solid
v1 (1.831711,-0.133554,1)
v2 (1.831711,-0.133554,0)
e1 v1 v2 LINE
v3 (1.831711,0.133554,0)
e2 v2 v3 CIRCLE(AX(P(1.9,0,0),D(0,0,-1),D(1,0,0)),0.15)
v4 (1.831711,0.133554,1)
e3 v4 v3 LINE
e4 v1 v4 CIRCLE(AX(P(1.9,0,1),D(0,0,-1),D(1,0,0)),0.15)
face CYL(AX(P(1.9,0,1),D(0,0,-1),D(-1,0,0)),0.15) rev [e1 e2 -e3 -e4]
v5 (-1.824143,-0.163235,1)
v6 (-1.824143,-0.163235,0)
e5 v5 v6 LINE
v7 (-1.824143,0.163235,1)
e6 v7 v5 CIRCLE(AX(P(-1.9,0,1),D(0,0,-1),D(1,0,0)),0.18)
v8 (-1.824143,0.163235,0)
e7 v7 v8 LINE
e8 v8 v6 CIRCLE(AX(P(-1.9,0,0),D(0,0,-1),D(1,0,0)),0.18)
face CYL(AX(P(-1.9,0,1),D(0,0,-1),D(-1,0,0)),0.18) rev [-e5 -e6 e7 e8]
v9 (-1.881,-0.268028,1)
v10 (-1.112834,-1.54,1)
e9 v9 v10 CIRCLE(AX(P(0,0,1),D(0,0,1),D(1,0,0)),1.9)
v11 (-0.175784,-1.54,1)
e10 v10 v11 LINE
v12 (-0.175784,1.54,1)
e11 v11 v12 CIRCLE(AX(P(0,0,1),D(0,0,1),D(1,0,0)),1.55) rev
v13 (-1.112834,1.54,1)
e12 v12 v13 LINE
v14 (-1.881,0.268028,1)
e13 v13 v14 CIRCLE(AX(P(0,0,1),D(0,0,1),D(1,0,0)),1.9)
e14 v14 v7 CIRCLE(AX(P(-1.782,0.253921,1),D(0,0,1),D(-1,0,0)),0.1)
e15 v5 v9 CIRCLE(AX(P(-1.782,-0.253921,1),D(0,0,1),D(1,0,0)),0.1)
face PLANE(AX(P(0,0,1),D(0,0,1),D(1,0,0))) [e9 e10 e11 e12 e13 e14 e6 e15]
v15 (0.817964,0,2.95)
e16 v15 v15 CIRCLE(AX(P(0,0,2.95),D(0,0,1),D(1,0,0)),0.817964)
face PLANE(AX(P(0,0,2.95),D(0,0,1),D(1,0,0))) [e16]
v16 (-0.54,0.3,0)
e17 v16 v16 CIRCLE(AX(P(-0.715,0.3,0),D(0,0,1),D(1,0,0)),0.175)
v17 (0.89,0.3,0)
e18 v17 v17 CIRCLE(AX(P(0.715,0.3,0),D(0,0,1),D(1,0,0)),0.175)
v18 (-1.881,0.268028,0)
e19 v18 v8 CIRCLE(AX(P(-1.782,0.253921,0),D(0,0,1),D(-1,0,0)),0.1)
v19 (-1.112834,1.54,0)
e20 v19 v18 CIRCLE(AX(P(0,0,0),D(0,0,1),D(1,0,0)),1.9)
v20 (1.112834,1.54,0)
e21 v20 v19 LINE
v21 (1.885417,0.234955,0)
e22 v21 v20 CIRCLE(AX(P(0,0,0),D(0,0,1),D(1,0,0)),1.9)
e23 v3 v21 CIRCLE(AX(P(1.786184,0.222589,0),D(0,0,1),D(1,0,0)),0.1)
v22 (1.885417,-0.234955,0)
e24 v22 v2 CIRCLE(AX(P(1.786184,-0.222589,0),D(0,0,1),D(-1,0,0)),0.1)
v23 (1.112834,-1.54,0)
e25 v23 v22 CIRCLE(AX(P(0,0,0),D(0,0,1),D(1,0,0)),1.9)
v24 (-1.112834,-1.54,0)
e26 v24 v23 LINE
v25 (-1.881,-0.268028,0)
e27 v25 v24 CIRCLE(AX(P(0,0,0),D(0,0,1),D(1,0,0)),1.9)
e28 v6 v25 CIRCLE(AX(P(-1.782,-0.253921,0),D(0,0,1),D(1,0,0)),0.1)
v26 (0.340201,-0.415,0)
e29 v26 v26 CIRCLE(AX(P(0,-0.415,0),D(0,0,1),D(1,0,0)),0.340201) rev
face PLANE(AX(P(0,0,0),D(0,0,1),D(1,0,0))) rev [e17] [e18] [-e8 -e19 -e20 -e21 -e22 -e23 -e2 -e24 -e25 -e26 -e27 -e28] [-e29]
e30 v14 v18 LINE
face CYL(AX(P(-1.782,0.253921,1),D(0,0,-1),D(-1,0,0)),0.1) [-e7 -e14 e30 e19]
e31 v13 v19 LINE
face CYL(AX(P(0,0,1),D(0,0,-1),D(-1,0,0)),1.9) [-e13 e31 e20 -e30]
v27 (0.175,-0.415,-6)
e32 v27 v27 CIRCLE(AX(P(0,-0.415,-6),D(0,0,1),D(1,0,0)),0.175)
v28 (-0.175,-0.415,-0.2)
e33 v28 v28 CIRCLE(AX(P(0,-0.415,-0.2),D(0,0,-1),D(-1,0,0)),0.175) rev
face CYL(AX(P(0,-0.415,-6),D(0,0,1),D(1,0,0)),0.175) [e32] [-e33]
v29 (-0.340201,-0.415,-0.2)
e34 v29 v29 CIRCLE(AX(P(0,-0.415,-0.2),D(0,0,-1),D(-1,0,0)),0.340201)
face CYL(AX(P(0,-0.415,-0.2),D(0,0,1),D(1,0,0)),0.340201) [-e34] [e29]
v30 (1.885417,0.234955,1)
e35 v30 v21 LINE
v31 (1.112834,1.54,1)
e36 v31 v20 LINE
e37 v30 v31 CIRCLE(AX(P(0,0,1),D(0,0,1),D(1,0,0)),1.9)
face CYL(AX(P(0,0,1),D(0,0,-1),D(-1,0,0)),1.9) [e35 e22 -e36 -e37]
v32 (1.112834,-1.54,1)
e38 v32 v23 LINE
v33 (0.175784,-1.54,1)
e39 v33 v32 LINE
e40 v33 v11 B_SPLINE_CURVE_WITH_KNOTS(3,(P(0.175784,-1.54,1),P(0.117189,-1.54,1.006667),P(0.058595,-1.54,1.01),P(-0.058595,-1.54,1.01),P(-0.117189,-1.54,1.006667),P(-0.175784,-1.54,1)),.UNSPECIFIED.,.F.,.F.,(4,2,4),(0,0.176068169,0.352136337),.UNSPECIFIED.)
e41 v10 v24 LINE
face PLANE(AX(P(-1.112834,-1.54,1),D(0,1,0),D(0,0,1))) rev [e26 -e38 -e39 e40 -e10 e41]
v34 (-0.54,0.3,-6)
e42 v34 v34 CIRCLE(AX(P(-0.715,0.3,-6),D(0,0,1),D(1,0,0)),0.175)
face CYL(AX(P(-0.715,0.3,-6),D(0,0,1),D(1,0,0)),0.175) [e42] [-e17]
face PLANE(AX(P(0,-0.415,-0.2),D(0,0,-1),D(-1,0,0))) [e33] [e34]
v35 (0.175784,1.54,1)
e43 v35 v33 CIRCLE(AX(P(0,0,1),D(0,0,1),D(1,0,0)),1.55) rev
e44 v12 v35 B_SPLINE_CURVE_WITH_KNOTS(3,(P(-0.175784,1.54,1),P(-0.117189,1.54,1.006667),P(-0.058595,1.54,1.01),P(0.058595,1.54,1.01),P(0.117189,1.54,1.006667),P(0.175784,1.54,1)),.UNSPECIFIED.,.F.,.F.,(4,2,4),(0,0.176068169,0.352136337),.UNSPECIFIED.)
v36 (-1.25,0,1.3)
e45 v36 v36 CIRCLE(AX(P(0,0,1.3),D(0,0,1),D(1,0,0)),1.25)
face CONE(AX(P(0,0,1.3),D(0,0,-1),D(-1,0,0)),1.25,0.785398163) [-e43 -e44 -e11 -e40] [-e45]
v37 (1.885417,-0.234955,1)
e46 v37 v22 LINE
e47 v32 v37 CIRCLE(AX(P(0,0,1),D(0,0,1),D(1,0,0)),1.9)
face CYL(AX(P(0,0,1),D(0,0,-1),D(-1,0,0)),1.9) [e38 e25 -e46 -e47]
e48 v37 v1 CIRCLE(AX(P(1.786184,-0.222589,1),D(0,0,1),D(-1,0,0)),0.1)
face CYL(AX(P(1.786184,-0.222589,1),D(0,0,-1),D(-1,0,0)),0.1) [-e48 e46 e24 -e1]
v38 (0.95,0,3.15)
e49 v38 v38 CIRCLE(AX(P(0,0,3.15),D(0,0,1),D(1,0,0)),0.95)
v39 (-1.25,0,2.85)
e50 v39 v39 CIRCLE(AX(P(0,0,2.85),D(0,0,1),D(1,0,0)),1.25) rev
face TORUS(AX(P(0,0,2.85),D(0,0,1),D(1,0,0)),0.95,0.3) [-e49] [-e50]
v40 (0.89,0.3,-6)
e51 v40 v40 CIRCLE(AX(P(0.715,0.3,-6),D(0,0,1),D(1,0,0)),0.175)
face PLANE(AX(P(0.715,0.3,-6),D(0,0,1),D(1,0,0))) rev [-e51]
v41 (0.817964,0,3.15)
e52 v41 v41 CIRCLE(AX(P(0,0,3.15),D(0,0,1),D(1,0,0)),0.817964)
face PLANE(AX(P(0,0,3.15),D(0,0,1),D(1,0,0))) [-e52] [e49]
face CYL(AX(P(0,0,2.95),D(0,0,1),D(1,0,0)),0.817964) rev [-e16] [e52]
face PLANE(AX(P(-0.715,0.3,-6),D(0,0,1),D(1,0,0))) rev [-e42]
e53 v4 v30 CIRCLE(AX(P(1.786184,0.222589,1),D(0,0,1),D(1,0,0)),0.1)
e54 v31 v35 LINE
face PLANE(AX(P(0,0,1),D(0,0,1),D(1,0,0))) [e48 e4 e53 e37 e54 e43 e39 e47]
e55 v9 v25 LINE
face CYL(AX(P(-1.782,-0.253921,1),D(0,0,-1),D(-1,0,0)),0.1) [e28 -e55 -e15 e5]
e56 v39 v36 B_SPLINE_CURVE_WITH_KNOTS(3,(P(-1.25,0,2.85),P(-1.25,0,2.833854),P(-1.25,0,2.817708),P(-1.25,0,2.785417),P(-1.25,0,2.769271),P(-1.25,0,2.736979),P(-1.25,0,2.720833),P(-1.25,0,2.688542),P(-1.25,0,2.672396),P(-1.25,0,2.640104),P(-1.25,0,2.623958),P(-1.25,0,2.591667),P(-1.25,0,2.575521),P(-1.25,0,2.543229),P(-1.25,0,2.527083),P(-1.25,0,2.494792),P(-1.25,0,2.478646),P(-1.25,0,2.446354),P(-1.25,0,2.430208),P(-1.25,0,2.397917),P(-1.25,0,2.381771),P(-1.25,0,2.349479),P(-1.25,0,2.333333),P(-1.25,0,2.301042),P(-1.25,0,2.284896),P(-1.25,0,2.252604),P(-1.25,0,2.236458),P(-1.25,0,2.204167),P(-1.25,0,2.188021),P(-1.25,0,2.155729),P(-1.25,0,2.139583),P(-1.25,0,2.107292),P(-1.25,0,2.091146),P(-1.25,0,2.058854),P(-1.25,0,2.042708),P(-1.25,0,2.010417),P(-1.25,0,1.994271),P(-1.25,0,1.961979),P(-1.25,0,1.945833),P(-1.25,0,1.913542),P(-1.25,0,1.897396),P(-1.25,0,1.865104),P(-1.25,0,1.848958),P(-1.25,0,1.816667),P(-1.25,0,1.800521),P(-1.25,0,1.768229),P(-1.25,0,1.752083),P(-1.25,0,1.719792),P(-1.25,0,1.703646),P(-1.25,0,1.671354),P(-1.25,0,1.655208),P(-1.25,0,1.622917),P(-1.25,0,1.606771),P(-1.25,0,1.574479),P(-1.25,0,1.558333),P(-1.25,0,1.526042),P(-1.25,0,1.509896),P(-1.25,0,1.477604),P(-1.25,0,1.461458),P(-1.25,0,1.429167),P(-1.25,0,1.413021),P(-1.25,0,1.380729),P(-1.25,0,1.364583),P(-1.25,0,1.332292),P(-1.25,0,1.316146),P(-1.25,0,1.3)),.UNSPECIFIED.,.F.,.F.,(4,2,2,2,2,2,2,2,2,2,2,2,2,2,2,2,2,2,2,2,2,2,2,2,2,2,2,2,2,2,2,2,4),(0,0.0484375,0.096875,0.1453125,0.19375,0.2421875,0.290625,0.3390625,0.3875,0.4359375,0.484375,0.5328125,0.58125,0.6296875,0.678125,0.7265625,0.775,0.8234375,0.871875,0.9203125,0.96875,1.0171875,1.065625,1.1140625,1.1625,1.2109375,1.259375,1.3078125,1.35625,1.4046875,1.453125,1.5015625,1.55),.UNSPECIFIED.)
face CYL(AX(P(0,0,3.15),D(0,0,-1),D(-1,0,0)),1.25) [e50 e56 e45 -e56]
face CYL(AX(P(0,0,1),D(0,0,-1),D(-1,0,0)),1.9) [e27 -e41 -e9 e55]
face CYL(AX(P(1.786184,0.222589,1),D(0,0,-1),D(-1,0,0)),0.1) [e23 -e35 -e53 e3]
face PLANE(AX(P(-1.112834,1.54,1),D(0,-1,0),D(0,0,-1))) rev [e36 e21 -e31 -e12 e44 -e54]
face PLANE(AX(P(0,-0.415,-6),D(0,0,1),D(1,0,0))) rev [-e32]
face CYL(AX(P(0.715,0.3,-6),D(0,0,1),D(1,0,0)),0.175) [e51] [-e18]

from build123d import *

# Parameters (mm, degrees)
BOSS_EXTRUDE1_DEPTH = 1
SKETCH3_R           = 1.25
BOSS_EXTRUDE2_DEPTH = 2.15
CHAMFER1_SIZE       = 0.3
FILLET1_R           = 0.3
SKETCH4_R           = 0.817963918
CUT_EXTRUDE1_DEPTH  = 0.2
SKETCH5_R           = 0.175
BOSS_EXTRUDE3_DEPTH = 6
SKETCH6_R           = 0.340201154
BOSS_EXTRUDE4_DEPTH = 0.2


with BuildPart() as part:
    # Sketch1 → Boss-Extrude1 (new body)
    with BuildSketch(Plane.XY):
        with BuildLine():
            Line((-1.112834219, 1.54), (1.112834219, 1.54))
            ThreePointArc((1.112834219, 1.54), (1.63498089, 0.967903657), (1.885416667, 0.2349553))
            ThreePointArc((1.885416667, 0.2349553), (1.874554764, 0.175784903), (1.831710526, 0.133553539))
            ThreePointArc((1.831710526, 0.133553539), (1.75, 0), (1.831710526, -0.133553539))
            ThreePointArc((1.831710526, -0.133553539), (1.874554764, -0.175784903), (1.885416667, -0.2349553))
            ThreePointArc((1.885416667, -0.2349553), (1.63498089, -0.967903657), (1.112834219, -1.54))
            Line((1.112834219, -1.54), (-1.112834219, -1.54))
            ThreePointArc((-1.112834219, -1.54), (-1.626419084, -0.982222462), (-1.881, -0.268027984))
            ThreePointArc((-1.881, -0.268027984), (-1.869896042, -0.206231776), (-1.824142857, -0.163235088))
            ThreePointArc((-1.824142857, -0.163235088), (-1.72, 0), (-1.824142857, 0.163235088))
            ThreePointArc((-1.824142857, 0.163235088), (-1.869896042, 0.206231776), (-1.881, 0.268027984))
            ThreePointArc((-1.881, 0.268027984), (-1.626419084, 0.982222462), (-1.112834219, 1.54))
        make_face()
    extrude(amount=BOSS_EXTRUDE1_DEPTH)

    # Sketch3 → Boss-Extrude2 (add)
    with BuildSketch(Plane.XY.offset(1)):
        with Locations(Location((0, 0, 0), (0, 0, 180))):
            Circle(SKETCH3_R)
    extrude(amount=BOSS_EXTRUDE2_DEPTH)

    # Chamfer1
    # the kernel refuses this chamfer: 0.3 mm, written as the material it adds along each edge
    with BuildSketch(Plane(origin=(0, 0, 1), x_dir=(-1, 0, 0), z_dir=(0, 1, 0))) as chamfer1_piece_1_section:
        Polygon((1.25 + CHAMFER1_SIZE, 0), (1.25, CHAMFER1_SIZE), (1.25, 0), align=None)
    chamfer1_piece_1 = revolve(axis=Axis((0, 0, 1), (0, 0, 1)), mode=Mode.PRIVATE)
    chamfer1_piece_1 = split(chamfer1_piece_1, bisect_by=Plane(origin=(1.394706395, -1.54, 1.144706395), z_dir=(0, 1, 0)), keep=Keep.TOP, mode=Mode.PRIVATE)
    chamfer1_piece_1 = split(chamfer1_piece_1, bisect_by=Plane(origin=(1.394706395, 1.54, 1.144706395), z_dir=(0, -1, 0)), keep=Keep.TOP, mode=Mode.PRIVATE)
    add(chamfer1_piece_1)

    # Fillet1
    fillet1_edges = [part.edges().sort_by_distance(p)[0] for p in [
        (1.25, 0, 3.15),
    ]]
    fillet(fillet1_edges, radius=FILLET1_R)

    # Sketch4 → Cut-Extrude1 (cut)
    with BuildSketch(Plane.XY.offset(3.15)):
        Circle(SKETCH4_R)
    extrude(amount=-CUT_EXTRUDE1_DEPTH, mode=Mode.SUBTRACT)

    # Sketch5 → Boss-Extrude3 (add)
    with BuildSketch(Plane.XY):
        with Locations((0.715, 0.3)):
            Circle(SKETCH5_R)
        with Locations((-0.715, 0.3)):
            Circle(SKETCH5_R)
        with Locations((0, -0.415)):
            Circle(SKETCH5_R)
    extrude(amount=-BOSS_EXTRUDE3_DEPTH)

    # Sketch6 → Boss-Extrude4 (add)
    with BuildSketch(Plane(origin=(0, 0, 0), x_dir=(-1, 0, 0), z_dir=(0, 0, -1))):
        with Locations(Location((0, -0.415, 0), (0, 0, 180))):
            Circle(SKETCH6_R)
    extrude(amount=BOSS_EXTRUDE4_DEPTH)


solid = part.part
